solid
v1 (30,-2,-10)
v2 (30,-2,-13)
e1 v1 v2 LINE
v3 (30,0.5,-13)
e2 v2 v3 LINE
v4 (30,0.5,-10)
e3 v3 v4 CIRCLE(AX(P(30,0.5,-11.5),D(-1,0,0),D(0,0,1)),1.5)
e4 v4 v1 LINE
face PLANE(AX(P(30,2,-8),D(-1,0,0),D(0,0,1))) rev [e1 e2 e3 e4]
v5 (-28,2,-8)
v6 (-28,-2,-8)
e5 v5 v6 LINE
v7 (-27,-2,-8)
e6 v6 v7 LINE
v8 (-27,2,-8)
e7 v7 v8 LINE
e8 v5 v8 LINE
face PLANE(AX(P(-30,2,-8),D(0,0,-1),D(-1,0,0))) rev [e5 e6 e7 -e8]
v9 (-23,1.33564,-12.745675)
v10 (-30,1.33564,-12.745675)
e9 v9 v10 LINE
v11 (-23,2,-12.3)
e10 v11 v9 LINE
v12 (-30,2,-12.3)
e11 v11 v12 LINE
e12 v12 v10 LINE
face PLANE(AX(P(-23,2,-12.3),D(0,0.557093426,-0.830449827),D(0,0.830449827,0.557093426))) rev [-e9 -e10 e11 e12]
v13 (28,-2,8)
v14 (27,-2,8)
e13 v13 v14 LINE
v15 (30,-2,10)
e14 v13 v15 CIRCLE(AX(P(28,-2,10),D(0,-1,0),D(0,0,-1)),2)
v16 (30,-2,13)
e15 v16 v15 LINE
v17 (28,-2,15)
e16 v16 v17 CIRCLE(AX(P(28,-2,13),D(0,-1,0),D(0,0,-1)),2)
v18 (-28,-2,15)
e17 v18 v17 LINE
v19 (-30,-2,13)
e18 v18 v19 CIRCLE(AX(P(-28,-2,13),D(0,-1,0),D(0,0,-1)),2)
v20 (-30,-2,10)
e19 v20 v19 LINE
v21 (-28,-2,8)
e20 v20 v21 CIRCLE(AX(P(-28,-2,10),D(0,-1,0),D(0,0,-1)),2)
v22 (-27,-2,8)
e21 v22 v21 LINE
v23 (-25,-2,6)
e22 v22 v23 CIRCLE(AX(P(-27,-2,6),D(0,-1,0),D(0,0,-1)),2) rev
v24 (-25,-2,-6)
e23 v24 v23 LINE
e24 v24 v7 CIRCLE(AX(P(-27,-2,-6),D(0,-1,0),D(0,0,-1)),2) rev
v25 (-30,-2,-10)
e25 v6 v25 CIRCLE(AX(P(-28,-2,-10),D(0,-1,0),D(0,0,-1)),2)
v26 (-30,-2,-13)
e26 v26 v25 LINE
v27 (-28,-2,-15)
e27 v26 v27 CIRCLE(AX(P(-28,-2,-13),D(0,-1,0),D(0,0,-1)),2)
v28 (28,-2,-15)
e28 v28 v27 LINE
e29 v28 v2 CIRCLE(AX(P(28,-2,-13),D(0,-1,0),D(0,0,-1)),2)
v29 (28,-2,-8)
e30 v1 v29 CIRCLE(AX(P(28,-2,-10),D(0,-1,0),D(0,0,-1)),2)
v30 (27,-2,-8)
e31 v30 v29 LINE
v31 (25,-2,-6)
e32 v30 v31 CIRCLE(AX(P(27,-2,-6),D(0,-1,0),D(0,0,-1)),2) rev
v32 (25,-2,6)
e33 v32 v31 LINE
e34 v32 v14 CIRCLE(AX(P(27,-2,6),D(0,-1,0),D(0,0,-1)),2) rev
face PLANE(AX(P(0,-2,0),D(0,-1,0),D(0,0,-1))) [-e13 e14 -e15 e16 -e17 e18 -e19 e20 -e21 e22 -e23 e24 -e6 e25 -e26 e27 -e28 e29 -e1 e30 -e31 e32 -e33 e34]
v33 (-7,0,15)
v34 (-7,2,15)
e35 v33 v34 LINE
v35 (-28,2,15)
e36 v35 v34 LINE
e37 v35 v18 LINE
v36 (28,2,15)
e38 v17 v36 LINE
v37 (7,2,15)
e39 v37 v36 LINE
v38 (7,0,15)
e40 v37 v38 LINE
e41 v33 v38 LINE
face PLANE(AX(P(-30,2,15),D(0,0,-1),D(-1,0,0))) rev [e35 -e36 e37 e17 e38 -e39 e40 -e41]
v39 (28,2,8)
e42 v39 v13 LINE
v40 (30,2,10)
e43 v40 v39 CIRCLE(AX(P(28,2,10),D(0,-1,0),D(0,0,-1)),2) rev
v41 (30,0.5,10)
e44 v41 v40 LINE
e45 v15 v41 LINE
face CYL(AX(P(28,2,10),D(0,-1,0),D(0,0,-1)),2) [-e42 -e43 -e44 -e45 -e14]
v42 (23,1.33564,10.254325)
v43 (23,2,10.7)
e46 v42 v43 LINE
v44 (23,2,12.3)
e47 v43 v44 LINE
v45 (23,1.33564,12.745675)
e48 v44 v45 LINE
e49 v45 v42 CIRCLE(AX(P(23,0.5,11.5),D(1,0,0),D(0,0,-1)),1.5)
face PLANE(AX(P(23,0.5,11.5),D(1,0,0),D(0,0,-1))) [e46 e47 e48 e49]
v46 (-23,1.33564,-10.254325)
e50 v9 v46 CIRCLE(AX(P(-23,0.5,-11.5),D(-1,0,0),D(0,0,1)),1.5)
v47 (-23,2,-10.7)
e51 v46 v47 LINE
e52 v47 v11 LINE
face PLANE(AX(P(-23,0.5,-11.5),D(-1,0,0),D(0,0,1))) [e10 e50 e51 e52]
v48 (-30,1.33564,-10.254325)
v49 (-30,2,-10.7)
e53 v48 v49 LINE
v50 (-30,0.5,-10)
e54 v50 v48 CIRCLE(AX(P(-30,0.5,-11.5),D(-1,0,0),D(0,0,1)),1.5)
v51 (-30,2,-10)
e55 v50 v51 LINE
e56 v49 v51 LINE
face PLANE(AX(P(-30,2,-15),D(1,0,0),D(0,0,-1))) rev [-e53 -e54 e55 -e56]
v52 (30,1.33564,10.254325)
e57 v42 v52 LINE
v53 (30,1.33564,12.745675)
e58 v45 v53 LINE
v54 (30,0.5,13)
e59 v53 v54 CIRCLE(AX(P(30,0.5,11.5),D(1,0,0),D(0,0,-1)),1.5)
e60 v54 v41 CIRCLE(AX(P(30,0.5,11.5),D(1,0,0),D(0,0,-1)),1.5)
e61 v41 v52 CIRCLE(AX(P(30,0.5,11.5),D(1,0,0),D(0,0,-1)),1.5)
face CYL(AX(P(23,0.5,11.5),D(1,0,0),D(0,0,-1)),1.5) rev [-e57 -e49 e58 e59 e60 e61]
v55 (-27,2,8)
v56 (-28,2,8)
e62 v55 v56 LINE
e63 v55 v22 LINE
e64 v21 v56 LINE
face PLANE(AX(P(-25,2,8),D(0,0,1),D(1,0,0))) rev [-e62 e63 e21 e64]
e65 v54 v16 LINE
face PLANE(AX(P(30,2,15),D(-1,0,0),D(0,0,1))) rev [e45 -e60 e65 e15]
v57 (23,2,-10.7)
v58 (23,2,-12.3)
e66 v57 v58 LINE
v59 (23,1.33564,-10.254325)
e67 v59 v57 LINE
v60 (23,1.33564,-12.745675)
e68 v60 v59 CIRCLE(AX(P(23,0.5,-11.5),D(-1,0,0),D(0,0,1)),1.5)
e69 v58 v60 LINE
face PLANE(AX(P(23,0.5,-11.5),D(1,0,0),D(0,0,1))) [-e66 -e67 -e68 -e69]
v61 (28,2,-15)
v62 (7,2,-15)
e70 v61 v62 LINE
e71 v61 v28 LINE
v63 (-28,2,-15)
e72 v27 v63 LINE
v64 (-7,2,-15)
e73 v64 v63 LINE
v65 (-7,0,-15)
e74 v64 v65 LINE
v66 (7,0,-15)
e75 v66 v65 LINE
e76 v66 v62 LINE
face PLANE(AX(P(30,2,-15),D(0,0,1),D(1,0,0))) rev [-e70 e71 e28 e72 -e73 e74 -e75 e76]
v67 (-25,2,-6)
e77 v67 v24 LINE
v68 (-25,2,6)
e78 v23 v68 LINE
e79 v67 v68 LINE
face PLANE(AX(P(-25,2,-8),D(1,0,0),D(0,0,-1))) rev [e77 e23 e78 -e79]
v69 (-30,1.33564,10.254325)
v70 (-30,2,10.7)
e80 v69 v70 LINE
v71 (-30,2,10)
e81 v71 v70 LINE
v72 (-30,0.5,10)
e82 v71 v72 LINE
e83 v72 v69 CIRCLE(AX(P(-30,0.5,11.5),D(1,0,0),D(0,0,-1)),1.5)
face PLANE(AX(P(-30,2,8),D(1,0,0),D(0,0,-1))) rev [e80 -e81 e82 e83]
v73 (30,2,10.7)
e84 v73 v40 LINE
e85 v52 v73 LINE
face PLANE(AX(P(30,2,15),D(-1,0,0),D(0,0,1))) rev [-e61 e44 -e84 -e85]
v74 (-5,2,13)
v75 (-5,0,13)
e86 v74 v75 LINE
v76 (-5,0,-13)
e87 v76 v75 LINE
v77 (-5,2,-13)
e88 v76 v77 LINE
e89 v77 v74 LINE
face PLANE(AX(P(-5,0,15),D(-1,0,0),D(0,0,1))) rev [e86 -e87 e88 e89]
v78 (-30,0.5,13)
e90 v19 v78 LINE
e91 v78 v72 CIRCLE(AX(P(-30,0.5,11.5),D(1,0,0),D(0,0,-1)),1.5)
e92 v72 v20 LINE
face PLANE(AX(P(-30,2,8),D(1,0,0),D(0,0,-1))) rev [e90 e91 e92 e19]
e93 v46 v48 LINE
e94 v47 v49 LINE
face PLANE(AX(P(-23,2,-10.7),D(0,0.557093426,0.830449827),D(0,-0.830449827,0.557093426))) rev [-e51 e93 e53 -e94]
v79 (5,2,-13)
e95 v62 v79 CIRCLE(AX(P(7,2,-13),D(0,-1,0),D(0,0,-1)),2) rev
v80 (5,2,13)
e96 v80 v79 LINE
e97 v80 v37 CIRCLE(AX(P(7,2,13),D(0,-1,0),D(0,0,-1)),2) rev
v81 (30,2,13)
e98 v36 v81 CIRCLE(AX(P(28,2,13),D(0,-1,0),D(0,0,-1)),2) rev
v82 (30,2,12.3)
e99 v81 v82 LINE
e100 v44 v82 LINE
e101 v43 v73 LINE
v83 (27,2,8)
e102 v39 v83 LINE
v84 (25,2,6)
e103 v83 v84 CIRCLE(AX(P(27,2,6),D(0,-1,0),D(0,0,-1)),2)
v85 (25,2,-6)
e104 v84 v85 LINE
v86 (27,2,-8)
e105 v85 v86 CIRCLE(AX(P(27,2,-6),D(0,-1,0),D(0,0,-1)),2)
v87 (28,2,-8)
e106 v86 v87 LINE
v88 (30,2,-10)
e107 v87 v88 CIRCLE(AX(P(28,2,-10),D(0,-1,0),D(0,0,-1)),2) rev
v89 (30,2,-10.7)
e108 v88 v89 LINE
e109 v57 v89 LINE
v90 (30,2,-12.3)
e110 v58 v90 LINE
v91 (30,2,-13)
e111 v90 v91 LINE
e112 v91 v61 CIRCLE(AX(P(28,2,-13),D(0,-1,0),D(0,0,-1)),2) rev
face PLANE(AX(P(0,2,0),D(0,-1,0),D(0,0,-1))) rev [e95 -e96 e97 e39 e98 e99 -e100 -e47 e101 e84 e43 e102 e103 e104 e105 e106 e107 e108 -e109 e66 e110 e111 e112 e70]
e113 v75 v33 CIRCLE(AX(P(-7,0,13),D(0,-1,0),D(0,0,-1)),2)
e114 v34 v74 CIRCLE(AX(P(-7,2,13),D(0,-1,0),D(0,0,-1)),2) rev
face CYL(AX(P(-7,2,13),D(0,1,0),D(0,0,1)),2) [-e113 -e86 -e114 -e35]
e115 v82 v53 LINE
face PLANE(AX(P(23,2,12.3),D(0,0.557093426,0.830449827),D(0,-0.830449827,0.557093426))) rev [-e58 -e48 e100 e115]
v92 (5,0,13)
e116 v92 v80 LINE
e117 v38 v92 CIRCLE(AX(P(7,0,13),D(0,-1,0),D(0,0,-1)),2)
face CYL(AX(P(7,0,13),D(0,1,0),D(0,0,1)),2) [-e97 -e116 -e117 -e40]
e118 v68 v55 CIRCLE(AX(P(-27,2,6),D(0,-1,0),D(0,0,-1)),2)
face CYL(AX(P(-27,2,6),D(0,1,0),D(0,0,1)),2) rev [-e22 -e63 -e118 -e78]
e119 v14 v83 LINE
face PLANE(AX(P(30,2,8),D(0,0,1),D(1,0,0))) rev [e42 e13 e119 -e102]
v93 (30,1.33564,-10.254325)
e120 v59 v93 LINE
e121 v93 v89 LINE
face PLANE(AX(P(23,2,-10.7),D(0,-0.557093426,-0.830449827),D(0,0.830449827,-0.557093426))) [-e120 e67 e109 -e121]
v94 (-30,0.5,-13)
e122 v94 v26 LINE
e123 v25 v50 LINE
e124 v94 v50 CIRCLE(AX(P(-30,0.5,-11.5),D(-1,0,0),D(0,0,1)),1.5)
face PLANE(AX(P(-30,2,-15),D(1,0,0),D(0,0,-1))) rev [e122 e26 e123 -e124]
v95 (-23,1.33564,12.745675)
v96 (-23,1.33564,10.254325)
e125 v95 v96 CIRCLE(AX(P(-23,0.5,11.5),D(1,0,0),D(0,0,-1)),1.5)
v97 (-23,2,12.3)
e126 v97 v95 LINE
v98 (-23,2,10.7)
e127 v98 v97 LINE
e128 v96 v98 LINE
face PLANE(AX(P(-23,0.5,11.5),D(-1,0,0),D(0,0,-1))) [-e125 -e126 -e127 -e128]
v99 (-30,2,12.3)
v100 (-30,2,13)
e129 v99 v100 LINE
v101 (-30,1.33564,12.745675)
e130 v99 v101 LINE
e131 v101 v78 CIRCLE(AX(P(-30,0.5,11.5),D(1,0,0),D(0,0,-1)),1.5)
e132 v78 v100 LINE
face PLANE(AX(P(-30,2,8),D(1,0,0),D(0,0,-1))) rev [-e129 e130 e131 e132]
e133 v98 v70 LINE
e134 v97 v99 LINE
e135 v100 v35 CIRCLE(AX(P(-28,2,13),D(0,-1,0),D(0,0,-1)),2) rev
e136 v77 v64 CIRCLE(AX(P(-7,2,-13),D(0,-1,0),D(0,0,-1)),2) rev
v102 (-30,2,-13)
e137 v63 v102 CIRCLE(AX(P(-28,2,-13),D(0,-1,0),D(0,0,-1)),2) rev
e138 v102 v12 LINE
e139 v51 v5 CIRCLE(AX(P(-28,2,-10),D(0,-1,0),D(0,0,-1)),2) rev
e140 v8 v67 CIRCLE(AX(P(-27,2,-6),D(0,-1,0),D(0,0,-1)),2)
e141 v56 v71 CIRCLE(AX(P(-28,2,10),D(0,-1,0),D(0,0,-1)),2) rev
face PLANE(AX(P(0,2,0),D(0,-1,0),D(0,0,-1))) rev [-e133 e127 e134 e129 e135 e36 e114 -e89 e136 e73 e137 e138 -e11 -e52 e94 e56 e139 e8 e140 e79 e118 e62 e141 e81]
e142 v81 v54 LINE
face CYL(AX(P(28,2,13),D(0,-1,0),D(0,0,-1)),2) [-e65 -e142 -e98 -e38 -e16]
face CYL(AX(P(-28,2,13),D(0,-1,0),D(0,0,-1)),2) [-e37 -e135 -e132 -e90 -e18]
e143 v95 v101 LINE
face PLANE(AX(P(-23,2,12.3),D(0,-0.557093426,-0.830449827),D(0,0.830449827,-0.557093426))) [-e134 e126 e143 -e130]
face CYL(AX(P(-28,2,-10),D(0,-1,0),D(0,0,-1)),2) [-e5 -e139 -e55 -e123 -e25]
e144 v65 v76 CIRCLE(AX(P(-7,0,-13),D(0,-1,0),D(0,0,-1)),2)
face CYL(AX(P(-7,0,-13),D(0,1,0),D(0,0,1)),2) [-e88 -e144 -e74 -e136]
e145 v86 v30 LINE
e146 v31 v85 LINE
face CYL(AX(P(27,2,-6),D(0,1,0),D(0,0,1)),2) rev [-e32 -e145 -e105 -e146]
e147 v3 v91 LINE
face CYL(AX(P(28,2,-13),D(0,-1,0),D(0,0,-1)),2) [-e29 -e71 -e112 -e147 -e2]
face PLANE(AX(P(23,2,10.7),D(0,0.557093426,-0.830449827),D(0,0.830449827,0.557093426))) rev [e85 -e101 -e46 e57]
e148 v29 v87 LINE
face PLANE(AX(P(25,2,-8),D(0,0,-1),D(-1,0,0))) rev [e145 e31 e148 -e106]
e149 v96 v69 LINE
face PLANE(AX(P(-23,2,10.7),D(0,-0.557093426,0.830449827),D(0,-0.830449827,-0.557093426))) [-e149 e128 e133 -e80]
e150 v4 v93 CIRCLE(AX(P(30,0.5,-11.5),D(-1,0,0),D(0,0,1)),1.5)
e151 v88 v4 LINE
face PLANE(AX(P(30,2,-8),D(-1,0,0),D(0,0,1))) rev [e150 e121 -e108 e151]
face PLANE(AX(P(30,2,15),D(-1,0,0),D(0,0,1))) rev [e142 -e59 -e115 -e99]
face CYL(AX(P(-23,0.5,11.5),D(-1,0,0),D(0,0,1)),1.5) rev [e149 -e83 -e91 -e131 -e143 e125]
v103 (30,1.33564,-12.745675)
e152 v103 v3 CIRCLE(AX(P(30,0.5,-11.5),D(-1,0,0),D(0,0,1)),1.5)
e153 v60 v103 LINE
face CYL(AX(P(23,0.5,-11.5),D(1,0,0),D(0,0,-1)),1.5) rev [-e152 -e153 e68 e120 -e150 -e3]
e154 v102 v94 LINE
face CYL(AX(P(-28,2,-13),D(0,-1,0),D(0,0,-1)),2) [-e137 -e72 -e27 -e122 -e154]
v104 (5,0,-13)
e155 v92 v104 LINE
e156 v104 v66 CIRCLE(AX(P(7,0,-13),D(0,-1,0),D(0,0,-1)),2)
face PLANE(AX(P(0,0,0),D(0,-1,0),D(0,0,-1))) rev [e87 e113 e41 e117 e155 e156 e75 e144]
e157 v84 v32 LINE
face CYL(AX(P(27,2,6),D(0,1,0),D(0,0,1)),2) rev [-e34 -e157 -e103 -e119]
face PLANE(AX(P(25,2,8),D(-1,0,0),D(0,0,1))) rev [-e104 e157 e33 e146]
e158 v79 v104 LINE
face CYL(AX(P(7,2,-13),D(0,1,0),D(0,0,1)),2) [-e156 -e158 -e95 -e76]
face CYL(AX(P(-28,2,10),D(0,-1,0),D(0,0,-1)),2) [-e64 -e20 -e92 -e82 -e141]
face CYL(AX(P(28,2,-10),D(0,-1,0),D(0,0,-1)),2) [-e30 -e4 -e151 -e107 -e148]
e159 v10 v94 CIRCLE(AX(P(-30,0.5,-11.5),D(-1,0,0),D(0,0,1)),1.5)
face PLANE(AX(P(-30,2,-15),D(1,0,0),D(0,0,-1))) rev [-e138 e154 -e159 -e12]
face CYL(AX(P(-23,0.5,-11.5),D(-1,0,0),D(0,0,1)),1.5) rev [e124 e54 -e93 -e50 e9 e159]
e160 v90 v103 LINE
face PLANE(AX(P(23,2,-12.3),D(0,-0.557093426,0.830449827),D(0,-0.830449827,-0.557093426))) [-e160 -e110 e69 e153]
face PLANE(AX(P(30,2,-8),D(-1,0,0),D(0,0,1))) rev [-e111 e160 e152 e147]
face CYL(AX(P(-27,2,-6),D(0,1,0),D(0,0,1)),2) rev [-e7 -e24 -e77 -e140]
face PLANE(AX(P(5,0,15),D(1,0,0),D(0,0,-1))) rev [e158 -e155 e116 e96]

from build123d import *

# Parameters (mm, degrees)
BOSS_EXTRUDE1_DEPTH  = 2
CUT_EXTRUDE1_DEPTH   = 7
MIRROR2_COPY_1_DEPTH = 7
SKETCH4_W            = 10
SKETCH4_H            = 30
CUT_EXTRUDE2_DEPTH   = 2
FILLET1_R            = 2


with BuildPart() as part:
    # Sketch2 → Boss-Extrude1 (new, symmetric)
    with BuildSketch(Plane(origin=(0, 0, 0), x_dir=(1, 0, 0), z_dir=(0, 1, 0))):
        Polygon((-25, -8), (-30, -8), (-30, -15), (30, -15), (30, -8), (25, -8), (25, 8), (30, 8), (30, 15), (-30, 15), (-30, 8), (-25, 8), align=None)
    extrude(amount=BOSS_EXTRUDE1_DEPTH, both=True)

    # Sketch3 → Cut-Extrude1 (cut)
    with BuildSketch(Plane(origin=(30, 0, 0), x_dir=(0, 0, -1), z_dir=(1, 0, 0))):
        with BuildLine():
            Line((-12.3, 2), (-12.74567474, 1.335640138))
            ThreePointArc((-12.74567474, 1.335640138), (-11.5, -1), (-10.25432526, 1.335640138))
            Line((-10.25432526, 1.335640138), (-10.7, 2))
            Line((-10.7, 2), (-12.3, 2))
        make_face()
    cut_extrude1 = extrude(amount=-CUT_EXTRUDE1_DEPTH, mode=Mode.SUBTRACT)

    # Mirror1: Cut-Extrude1 across plane
    add(cut_extrude1.mirror(Plane(origin=(0, 0, 0), x_dir=(0, 0, 1), z_dir=(1, 0, 0))), mode=Mode.SUBTRACT)

    # Mirror2: Cut-Extrude1 across plane
    add(cut_extrude1.mirror(Plane.XY), mode=Mode.SUBTRACT)

    # Mirror2 copy 1 sketch → Mirror2 copy 1 (cut)
    with BuildSketch(Plane.ZY.offset(30)):
        with BuildLine():
            Line((-12.3, 2), (-12.74567474, 1.335640138))
            ThreePointArc((-12.74567474, 1.335640138), (-11.5, -1), (-10.25432526, 1.335640138))
            Line((-10.25432526, 1.335640138), (-10.7, 2))
            Line((-10.7, 2), (-12.3, 2))
        make_face()
    extrude(amount=-MIRROR2_COPY_1_DEPTH, mode=Mode.SUBTRACT)

    # Sketch4 → Cut-Extrude2 (cut)
    with BuildSketch(Plane(origin=(0, 2, 0), x_dir=(1, 0, 0), z_dir=(0, 1, 0))):
        Rectangle(SKETCH4_W, SKETCH4_H)
    extrude(amount=-CUT_EXTRUDE2_DEPTH, mode=Mode.SUBTRACT)

    # Fillet1
    fillet1_edges = [part.edges().sort_by_distance(p)[0] for p in [
        (5, 1, -15),
        (5, 1, 15),
        (-5, 1, 15),
        (-5, 1, -15),
        (-25, 0, -8),
        (-30, 0, -8),
        (-30, 0, -15),
        (30, 0, -15),
        (30, 0, -8),
        (25, 0, -8),
        (25, 0, 8),
        (30, 0, 8),
        (30, 0, 15),
        (-30, 0, 15),
        (-30, 0, 8),
        (-25, 0, 8),
    ]]
    fillet(fillet1_edges, radius=FILLET1_R - 0.0001)  # a hair under: the kernel refuses the full size


solid = part.part
